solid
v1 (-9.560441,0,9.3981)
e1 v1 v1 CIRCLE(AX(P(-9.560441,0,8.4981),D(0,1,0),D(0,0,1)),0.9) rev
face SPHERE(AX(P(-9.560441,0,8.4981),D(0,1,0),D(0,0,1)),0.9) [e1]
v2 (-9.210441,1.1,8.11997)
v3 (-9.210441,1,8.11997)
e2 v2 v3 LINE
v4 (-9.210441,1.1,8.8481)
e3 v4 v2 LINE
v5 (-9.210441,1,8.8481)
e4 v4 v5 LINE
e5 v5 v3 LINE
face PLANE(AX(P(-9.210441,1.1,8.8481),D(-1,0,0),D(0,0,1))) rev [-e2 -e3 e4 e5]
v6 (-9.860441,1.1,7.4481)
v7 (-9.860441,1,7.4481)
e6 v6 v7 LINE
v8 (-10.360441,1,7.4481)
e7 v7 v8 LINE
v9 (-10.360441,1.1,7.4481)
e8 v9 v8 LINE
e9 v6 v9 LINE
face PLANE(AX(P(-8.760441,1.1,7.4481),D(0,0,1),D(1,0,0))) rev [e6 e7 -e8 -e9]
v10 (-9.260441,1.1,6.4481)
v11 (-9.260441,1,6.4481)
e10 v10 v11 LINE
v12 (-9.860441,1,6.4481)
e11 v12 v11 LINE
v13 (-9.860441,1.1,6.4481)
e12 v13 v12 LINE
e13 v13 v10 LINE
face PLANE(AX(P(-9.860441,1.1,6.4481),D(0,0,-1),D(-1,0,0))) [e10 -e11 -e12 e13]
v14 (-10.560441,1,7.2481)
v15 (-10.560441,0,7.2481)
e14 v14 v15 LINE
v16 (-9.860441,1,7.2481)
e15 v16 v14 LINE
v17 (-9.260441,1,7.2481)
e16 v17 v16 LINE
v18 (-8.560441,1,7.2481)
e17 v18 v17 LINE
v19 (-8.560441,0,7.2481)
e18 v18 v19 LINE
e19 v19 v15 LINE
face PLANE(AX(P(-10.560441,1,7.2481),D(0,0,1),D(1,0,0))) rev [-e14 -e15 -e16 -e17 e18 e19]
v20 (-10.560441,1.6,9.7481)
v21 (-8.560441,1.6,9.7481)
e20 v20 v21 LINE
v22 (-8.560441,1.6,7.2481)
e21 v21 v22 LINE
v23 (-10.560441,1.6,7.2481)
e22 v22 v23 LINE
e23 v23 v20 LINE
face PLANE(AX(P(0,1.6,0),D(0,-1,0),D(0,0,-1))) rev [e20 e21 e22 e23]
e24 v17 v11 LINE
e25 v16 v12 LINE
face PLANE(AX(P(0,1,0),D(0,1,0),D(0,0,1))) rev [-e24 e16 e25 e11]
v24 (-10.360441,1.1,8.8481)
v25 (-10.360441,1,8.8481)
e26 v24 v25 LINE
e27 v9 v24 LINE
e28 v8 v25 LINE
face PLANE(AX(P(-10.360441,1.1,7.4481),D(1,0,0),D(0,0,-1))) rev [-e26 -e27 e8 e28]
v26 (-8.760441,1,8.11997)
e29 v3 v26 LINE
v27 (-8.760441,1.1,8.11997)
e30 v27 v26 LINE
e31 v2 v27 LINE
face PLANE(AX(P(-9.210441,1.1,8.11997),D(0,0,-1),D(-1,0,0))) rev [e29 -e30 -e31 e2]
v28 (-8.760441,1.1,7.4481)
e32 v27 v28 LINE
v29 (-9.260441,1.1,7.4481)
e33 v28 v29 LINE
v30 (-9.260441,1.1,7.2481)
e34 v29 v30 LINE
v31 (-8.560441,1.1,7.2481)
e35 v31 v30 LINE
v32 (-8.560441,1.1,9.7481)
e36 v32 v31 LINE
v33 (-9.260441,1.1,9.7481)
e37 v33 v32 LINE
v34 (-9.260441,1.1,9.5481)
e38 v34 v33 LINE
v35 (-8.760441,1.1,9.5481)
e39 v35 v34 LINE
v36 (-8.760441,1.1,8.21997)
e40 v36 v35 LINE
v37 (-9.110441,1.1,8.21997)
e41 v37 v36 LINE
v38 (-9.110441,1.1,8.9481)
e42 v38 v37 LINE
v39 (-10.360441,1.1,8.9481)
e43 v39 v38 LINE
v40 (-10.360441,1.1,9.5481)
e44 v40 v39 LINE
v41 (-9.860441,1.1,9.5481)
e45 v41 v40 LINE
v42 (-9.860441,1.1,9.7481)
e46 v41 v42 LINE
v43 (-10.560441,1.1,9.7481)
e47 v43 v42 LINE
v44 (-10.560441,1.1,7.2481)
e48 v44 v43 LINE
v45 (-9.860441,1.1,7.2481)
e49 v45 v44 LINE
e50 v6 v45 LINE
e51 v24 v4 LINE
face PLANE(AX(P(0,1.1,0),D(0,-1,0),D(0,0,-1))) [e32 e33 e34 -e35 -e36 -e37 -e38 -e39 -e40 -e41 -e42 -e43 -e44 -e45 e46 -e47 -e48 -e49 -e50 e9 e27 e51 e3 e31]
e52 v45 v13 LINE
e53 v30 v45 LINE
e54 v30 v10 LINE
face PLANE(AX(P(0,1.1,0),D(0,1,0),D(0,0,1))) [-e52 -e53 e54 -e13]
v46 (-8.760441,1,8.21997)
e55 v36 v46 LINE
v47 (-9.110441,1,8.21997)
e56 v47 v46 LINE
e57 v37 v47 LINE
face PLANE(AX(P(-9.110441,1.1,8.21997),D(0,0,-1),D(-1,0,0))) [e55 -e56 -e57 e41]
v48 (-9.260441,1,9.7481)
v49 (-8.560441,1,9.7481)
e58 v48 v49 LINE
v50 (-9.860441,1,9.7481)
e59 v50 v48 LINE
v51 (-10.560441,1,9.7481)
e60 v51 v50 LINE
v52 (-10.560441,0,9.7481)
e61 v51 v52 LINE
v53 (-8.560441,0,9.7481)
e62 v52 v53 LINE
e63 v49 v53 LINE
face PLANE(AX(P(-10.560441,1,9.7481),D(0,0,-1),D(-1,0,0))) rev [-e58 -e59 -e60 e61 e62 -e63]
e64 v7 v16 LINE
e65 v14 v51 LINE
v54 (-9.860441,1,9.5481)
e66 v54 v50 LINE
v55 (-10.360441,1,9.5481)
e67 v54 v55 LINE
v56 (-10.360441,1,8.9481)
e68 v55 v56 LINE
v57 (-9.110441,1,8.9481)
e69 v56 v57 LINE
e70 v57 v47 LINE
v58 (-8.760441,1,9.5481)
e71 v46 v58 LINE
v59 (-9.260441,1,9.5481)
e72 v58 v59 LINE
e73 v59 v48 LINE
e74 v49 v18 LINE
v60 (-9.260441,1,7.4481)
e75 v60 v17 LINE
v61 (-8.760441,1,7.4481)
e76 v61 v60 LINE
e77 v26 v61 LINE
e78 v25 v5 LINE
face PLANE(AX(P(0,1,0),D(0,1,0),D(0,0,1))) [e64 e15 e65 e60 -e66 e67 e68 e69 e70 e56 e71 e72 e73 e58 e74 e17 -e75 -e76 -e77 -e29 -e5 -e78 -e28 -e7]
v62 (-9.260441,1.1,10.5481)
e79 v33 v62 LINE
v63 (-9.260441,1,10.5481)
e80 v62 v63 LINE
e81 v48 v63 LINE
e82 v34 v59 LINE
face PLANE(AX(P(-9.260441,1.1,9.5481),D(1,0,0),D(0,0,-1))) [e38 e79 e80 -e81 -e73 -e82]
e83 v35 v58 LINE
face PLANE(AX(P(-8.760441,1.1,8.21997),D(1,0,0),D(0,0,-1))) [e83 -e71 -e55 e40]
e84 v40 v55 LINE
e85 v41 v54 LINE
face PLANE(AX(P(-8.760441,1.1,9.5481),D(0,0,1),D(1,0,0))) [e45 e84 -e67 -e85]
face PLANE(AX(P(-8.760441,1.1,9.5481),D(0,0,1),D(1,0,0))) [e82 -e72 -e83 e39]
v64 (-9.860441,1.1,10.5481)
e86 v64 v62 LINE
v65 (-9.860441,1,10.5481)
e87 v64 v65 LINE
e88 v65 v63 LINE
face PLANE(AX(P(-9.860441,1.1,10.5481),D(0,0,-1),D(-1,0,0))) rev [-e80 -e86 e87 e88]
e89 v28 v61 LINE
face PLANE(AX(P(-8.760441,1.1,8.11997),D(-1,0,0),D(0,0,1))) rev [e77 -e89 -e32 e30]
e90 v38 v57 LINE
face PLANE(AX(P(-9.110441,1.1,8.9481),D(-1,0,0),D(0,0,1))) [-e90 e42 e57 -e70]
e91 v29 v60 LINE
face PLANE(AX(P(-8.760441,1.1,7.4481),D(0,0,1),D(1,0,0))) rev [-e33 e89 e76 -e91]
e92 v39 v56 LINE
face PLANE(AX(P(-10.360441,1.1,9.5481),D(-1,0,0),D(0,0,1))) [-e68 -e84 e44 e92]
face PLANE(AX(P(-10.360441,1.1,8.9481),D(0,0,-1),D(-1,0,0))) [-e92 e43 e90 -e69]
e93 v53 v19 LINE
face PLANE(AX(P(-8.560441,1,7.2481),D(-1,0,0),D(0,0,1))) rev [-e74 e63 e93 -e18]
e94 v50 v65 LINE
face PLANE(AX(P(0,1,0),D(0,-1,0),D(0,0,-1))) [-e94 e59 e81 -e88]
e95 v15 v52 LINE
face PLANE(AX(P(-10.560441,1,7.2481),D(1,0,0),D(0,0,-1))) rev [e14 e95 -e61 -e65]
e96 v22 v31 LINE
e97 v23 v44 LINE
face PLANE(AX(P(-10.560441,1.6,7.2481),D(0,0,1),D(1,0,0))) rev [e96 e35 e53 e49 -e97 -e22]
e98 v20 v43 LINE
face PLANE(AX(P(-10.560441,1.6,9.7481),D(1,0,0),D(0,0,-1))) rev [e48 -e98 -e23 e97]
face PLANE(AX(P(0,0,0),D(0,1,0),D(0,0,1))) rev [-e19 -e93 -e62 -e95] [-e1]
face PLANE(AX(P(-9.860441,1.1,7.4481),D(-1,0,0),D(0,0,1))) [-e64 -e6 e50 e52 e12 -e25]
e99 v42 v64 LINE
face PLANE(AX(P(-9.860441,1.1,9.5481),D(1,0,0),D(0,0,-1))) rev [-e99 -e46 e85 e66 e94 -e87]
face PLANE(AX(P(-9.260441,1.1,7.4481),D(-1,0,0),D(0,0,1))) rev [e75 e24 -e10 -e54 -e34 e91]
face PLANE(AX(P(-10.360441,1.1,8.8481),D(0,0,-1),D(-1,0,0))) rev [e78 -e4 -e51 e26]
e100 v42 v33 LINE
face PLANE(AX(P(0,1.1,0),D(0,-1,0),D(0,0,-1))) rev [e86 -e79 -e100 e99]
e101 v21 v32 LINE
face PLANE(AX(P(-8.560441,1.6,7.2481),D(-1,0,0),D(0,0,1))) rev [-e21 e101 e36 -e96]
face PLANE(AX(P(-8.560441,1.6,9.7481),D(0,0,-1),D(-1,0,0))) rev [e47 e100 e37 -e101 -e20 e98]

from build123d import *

# Parameters (mm, degrees)
SCHIZZO1_W                   = 2
SCHIZZO1_H                   = 2.5
ESTRUSIONE_ESTRUSIONE1_DEPTH = 1
SCHIZZO2_R                   = 0.9
ESTRUSIONE_ESTRUSIONE2_DEPTH = 0.9
RACCORDO1_R                  = 0.9
SCHIZZO4_W                   = 0.6
SCHIZZO4_H                   = 1
ESTRUSIONE_ESTRUSIONE3_DEPTH = 0.1
SCHIZZO6_W                   = 2
SCHIZZO6_H                   = 2.5
ESTRUSIONE_ESTRUSIONE5_DEPTH = 0.5


with BuildPart() as part:
    # Schizzo1 → Estrusione-Estrusione1 (new body)
    with BuildSketch(Plane(origin=(0, 0, 0), x_dir=(1, 0, 0), z_dir=(0, 1, 0))):
        with Locations((-9.560441298, -8.49809966)):
            Rectangle(SCHIZZO1_W, SCHIZZO1_H)
    extrude(amount=ESTRUSIONE_ESTRUSIONE1_DEPTH)

    # Schizzo2 → Estrusione-Estrusione2 (add)
    with BuildSketch(Plane.XZ):
        with Locations(Location((-9.560441298, 8.49809966, 0), (0, 0, 90))):
            Circle(SCHIZZO2_R)
    extrude(amount=ESTRUSIONE_ESTRUSIONE2_DEPTH)

    # Raccordo1
    raccordo1_edges = [part.edges().sort_by_distance(p)[0] for p in [
        (-9.560441298, -0.9, 7.59809966),
    ]]
    fillet(raccordo1_edges, radius=RACCORDO1_R - 0.0001)  # a hair under: the kernel refuses the full size

    # Schizzo4 → Estrusione-Estrusione3 (add)
    with BuildSketch(Plane(origin=(0, 1, 0), x_dir=(1, 0, 0), z_dir=(0, 1, 0))):
        Polygon((-10.360441298, -8.84809966), (-9.210441298, -8.84809966), (-9.210441298, -8.1199702), (-8.760441298, -8.1199702), (-8.760441298, -7.44809966), (-10.360441298, -7.44809966), align=None)
        Polygon((-10.360441298, -8.94809966), (-9.110441298, -8.94809966), (-9.110441298, -8.2199702), (-8.760441298, -8.2199702), (-8.760441298, -9.54809966), (-10.360441298, -9.54809966), align=None)
        with Locations((-9.560441298, -10.04809966)):
            Rectangle(SCHIZZO4_W, SCHIZZO4_H)
        with Locations((-9.560441298, -6.94809966)):
            Rectangle(SCHIZZO4_W, SCHIZZO4_H)
    extrude(amount=ESTRUSIONE_ESTRUSIONE3_DEPTH)

    # Schizzo6 → Estrusione-Estrusione5 (add)
    with BuildSketch(Plane(origin=(0, 1.1, 0), x_dir=(1, 0, 0), z_dir=(0, 1, 0))):
        with Locations((-9.560441298, -8.49809966)):
            Rectangle(SCHIZZO6_W, SCHIZZO6_H)
    extrude(amount=ESTRUSIONE_ESTRUSIONE5_DEPTH)


solid = part.part
